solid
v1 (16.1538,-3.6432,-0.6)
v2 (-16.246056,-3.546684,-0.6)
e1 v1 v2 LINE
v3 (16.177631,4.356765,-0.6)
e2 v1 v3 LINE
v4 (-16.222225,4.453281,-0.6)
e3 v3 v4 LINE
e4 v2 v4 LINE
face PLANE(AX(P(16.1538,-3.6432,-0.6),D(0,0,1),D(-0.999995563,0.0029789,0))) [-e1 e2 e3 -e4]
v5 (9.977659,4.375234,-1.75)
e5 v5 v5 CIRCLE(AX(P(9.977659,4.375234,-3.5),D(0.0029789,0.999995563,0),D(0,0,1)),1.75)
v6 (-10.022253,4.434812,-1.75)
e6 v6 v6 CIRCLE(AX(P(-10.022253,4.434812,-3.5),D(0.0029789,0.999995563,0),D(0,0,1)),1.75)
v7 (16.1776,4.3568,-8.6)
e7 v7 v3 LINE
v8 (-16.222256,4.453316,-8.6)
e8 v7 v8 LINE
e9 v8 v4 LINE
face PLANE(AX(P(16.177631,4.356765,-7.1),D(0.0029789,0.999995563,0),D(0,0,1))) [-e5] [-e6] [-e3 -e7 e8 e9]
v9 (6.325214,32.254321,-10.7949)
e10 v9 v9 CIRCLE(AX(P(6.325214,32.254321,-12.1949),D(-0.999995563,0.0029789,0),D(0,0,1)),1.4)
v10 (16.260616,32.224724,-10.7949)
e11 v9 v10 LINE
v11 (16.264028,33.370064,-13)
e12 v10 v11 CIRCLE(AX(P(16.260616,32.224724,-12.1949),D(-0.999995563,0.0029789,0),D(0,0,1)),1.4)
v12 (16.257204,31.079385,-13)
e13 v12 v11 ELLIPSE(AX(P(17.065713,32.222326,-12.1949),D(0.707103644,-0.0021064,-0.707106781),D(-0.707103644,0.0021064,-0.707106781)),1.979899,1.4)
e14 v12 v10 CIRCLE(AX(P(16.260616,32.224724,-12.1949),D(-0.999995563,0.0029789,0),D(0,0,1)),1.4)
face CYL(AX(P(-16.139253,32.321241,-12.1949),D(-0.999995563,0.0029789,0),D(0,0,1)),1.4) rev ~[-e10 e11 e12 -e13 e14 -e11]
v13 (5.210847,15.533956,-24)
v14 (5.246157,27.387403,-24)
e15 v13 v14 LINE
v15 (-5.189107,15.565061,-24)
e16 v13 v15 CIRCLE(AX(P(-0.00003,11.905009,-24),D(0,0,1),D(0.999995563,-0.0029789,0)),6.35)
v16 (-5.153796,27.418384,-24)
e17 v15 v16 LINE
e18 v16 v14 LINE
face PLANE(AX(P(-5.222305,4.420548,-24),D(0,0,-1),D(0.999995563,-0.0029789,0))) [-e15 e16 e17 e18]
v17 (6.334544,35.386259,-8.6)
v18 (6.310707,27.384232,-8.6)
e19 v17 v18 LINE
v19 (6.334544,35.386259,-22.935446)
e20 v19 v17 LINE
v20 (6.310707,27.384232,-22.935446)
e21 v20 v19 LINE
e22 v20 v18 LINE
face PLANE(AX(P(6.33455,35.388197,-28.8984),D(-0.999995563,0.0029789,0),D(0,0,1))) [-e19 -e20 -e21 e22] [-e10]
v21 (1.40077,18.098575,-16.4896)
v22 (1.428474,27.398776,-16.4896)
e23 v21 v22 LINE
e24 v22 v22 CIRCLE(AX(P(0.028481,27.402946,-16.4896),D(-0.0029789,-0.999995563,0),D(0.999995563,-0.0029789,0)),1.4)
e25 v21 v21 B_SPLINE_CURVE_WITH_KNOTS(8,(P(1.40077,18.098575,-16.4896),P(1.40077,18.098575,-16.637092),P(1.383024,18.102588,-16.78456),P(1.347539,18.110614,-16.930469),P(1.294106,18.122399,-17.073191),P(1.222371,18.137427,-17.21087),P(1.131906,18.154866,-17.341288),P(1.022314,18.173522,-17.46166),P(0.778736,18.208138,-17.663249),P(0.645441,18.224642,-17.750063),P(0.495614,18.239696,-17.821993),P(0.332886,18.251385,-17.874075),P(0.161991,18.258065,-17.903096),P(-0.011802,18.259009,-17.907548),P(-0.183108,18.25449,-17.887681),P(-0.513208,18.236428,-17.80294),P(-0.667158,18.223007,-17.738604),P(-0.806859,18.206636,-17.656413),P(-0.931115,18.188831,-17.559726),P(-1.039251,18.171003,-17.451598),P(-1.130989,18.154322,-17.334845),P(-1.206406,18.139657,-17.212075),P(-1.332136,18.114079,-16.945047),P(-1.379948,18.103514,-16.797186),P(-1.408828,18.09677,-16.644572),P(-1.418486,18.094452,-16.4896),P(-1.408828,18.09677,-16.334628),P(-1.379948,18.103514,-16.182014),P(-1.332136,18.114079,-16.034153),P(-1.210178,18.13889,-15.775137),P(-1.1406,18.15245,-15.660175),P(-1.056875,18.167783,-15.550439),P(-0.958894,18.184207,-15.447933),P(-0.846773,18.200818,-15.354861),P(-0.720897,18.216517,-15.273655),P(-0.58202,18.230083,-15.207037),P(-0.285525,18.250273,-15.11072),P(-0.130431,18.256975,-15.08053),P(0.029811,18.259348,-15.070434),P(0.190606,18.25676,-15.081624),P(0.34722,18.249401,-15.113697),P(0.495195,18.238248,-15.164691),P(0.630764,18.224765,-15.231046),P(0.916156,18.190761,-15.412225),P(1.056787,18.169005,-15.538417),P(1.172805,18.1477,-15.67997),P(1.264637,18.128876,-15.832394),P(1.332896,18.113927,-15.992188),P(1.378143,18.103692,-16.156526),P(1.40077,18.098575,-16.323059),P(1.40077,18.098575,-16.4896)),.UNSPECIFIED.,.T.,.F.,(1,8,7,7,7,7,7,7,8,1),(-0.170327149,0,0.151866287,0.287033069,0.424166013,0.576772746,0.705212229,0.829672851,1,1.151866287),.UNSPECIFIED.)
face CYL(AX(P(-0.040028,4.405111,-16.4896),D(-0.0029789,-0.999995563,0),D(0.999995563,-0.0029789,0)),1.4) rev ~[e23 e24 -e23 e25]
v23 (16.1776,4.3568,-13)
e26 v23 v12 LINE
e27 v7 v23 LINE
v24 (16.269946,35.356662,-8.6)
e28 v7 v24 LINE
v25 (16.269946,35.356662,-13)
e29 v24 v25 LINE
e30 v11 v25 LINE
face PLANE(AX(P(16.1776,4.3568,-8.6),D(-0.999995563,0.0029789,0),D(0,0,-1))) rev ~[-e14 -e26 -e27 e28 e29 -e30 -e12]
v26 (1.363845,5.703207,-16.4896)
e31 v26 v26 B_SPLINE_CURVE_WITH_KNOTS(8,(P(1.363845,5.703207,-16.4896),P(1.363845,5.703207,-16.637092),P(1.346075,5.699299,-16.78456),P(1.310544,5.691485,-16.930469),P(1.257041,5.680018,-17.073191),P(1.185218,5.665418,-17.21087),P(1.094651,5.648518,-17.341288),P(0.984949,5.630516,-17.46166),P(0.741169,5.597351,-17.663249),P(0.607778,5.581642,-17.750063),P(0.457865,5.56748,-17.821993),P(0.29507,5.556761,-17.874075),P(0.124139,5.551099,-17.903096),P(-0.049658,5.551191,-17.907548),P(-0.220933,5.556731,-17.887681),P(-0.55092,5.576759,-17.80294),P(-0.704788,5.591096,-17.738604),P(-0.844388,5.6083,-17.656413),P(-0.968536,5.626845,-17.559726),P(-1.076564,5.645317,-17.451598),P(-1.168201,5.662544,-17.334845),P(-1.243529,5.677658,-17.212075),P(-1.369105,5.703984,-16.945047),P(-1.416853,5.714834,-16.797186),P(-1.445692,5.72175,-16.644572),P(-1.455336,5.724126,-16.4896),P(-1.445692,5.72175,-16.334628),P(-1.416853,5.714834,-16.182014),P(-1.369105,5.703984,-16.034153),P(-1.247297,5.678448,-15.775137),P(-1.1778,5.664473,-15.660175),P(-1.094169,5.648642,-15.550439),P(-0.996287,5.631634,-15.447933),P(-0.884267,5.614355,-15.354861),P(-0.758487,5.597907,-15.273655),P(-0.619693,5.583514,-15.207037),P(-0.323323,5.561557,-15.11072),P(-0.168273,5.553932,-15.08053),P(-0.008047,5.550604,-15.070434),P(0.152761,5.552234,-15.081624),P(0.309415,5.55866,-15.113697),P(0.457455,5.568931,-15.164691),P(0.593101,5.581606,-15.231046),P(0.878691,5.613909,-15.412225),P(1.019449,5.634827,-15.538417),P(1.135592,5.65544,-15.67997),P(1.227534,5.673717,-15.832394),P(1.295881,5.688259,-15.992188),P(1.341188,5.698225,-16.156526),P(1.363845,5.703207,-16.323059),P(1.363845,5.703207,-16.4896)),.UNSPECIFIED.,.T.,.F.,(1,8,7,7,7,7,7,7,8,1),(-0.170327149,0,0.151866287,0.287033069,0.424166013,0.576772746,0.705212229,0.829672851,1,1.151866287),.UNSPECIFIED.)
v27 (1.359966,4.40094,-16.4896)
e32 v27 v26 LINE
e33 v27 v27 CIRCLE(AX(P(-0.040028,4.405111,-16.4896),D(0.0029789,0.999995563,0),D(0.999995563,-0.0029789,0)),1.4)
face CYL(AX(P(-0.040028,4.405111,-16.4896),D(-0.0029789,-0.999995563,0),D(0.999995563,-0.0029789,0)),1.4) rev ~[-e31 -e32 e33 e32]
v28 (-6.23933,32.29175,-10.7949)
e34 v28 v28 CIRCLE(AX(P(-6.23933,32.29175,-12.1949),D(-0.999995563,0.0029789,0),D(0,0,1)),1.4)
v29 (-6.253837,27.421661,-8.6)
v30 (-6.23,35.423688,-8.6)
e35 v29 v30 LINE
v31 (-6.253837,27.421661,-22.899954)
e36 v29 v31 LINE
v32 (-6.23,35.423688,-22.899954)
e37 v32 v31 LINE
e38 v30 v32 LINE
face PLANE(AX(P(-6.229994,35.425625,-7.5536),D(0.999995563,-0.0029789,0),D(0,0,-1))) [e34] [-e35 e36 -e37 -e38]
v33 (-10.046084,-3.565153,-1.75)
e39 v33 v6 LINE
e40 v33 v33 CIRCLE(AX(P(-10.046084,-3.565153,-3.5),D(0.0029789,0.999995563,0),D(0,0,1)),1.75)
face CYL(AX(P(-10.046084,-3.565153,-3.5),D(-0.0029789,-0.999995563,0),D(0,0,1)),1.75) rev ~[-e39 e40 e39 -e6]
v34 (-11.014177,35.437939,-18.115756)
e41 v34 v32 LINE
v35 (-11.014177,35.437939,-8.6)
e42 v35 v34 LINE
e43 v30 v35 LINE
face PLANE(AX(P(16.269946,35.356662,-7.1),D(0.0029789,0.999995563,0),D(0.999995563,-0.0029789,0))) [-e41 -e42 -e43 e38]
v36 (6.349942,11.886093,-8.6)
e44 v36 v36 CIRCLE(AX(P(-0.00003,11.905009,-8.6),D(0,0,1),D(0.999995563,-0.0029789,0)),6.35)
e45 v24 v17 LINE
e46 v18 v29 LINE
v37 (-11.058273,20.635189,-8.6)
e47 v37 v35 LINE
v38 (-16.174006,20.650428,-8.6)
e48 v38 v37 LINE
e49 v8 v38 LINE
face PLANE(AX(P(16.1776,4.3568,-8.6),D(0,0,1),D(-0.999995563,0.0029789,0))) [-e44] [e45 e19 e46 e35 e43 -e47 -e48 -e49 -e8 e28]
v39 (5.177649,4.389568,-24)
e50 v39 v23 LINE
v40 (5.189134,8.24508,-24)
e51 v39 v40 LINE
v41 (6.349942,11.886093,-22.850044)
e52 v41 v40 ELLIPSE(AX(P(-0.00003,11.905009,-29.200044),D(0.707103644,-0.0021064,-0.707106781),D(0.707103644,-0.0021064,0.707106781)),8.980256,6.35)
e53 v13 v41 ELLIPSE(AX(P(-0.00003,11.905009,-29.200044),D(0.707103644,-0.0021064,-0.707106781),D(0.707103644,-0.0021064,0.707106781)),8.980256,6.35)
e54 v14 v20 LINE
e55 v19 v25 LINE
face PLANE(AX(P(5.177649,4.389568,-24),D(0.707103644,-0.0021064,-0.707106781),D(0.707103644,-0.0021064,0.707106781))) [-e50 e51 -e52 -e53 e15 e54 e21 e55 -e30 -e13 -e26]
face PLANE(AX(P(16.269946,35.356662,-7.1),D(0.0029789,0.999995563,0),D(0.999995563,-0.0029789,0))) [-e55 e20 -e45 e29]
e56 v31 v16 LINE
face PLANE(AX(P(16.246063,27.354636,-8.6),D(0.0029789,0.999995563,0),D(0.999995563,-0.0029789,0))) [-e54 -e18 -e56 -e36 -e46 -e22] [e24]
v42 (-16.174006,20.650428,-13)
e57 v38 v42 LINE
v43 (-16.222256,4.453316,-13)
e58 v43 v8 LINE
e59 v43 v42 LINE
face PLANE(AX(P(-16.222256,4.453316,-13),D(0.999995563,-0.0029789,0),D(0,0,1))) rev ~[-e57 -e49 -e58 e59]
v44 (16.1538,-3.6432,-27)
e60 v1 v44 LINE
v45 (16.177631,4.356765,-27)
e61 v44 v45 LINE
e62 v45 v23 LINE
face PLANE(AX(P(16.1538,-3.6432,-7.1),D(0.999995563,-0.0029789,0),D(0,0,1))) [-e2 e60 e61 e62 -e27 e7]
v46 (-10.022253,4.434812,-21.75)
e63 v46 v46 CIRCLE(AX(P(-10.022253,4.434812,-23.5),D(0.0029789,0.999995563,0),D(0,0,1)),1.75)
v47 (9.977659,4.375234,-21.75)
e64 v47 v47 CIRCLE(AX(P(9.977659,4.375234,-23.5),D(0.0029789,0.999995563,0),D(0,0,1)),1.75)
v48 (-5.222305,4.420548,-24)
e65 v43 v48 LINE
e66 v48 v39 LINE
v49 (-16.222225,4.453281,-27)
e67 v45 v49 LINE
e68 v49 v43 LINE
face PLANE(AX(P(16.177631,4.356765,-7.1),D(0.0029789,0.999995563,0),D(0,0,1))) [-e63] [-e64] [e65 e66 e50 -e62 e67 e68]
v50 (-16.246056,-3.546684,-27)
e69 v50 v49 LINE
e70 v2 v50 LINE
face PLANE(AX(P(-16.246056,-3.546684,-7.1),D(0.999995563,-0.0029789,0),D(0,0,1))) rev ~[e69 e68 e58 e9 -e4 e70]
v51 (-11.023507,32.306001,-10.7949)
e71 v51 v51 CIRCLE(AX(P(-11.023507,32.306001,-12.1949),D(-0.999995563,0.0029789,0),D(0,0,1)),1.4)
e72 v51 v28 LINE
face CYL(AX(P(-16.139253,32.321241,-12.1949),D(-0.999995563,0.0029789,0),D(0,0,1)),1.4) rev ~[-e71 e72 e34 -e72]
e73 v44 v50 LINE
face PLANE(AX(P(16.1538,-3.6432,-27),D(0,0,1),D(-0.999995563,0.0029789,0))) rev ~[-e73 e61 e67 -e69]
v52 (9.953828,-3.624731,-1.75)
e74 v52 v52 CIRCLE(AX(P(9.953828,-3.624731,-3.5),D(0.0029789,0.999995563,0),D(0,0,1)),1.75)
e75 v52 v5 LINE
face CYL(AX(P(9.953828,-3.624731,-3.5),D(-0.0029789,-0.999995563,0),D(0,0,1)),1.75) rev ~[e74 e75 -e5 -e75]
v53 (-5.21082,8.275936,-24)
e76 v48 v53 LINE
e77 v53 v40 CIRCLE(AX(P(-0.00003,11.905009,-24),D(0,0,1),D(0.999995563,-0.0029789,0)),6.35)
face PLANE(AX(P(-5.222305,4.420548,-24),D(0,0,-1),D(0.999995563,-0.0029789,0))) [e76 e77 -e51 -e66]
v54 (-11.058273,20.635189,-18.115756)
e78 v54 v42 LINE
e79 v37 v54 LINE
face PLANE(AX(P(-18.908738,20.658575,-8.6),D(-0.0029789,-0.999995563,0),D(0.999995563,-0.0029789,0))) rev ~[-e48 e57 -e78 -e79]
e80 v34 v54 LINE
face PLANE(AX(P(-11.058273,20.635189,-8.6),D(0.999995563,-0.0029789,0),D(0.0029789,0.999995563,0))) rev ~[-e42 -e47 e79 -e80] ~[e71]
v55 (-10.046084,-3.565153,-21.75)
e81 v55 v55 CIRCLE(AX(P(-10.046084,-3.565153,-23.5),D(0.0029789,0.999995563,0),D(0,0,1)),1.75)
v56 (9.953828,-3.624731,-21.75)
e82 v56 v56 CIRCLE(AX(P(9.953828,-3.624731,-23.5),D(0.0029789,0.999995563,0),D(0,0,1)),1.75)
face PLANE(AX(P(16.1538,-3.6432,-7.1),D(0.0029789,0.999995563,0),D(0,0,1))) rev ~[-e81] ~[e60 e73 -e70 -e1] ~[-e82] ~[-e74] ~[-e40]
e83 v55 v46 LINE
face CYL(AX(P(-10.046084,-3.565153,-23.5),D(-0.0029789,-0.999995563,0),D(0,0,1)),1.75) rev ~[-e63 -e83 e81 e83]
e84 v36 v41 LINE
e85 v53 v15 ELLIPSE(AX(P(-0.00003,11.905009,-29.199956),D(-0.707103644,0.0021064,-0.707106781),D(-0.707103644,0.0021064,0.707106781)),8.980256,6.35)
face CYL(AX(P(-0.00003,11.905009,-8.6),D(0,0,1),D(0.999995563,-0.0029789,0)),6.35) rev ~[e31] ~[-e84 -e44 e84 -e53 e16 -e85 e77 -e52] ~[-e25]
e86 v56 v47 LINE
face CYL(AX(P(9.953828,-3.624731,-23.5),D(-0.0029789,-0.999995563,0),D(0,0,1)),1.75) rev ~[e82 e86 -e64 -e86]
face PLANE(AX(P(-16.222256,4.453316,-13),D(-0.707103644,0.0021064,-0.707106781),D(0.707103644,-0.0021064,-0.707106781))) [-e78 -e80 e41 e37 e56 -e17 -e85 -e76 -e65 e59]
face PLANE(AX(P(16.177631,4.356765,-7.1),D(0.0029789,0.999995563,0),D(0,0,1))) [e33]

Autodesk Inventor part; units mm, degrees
ref_plane "YZ Plane" through (0, 0, 0) normal (1, 0, 0) x (0, 1, 0)
ref_plane "Work Plane5" through (16.1538, -3.6432, -7.1) normal (0.0029789, 0.9999956, 0) x (0, 0, 1)
sketch "Sketch5" plane through (16.1538, -3.6432, -7.1) normal (0.0029789, 0.9999956, 0) x (0, 0, 1)
  circle A0 centre (-16.4, -26.2) radius 1.75 projected
  circle A1 centre (-16.4, -6.2) radius 1.75 projected
  line L0 (0, -32.4) -> (6.5, -32.4) projected
  line L1 (6.5, 0) -> (6.5, -32.4) projected
  line L2 (0, 0) -> (6.5, 0) projected
  line L3 (0, 0) -> (0, -32.4) projected
  circle A2 centre (3.6, -6.2) radius 1.75 projected
  circle A3 centre (3.6, -26.2) radius 1.75 projected
  line L4 (-19.9, 0) -> (-19.9, -32.4) projected
  line L5 (6.5, -32.4) -> (-19.9, -32.4)
  line L6 (-19.9, -32.4) -> (-19.9, 0)
  line L7 (-19.9, 0) -> (6.5, 0)
  line L8 (6.5, 0) -> (6.5, -32.4)
  point P0 (7.1, -16.1645)
extrude "Extrusion4" add sketch "Sketch5" along normal blind 8
sketch "Sketch7" plane through (16.1776, 4.3568, -7.1) normal (0.0029789, 0.9999956, 0) x (0.9999956, -0.0029789, 0)
  point P0 (-16.1645, -7.1)
sketch "Sketch8" plane through (16.1776, 4.3568, -7.1) normal (0.0029789, 0.9999956, 0) x (0.9999956, -0.0029789, 0)
  circle A0 centre (-26.2, -3.6) radius 1.75 projected
  circle A1 centre (-6.2, -3.6) radius 1.75 projected
  circle A2 centre (-6.2, 16.4) radius 1.75 projected
  circle A3 centre (-26.2, 16.4) radius 1.75 projected
  line L0 (-32.4, -6.5) -> (0, -6.5) projected
  line L1 (0, -6.5) -> (0, 19.9) projected
  line L2 (0, 19.9) -> (-32.4, 19.9) projected
  line L3 (-32.4, 19.9) -> (-32.4, -6.5) projected
  circle A4 centre (-16.2177, 39.3896) radius 1.75 projected
  line L4 (-22.2006, -0.6104) -> (-22.0458, -0.6104) projected
  line L5 (-22.2, -0.6104) -> (-22.2, -0.6104) projected
  line L6 (-22.2, -0.6104) -> (-21.7015, -0.6104) projected
  line L7 (-21.7015, -0.6104) -> (-14.6224, -0.6104) projected
  line L8 (-14.6224, -0.6104) -> (-13.8248, -0.6104) projected
  line L9 (-13.8248, -0.6104) -> (-10.7339, -0.6104) projected
  line L10 (-10.7339, -0.6104) -> (-10.2354, -0.6104) projected
  line L11 (-10.2354, -0.6104) -> (-10.2354, -0.6104) projected
  line L12 (-10.3901, -0.6104) -> (-10.2354, -0.6104) projected
  line L13 (-10.966, -0.6104) -> (-10.3901, -0.6104) projected
  line L14 (-11.1588, -0.6104) -> (-10.966, -0.6104) projected
  line L15 (-11.1588, -0.6104) -> (-11.5034, -0.6104) projected
  line L16 (-11.731, -0.6104) -> (-11.5034, -0.6104) projected
  line L17 (-11.731, -0.6104) -> (-11.731, -0.6104) projected
  line L18 (-11.731, -0.6104) -> (-11.5034, -0.6104) projected
  line L19 (-11.5034, -0.6104) -> (-11.1379, -0.6104) projected
  line L20 (-11.1379, -0.6104) -> (-10.9487, -0.6104) projected
  line L21 (-10.9487, -0.6104) -> (-10.3901, -0.6104) projected
  line L22 (-10.3901, -0.6104) -> (-10.2354, -0.6104) projected
  line L23 (-10.2354, -0.6104) -> (-10.2354, -0.6104) projected
  line L24 (-10.2354, -0.6104) -> (-10.7339, -0.6104) projected
  line L25 (-10.7339, -0.6104) -> (-21.7015, -0.6104) projected
  line L26 (-21.7015, -0.6104) -> (-22.2, -0.6104) projected
  line L27 (-22.2, -0.6104) -> (-22.2, -0.6104) projected
  line L28 (-22.2001, -0.6104) -> (-22.0454, -0.6104) projected
  line L29 (-22.0454, -0.6104) -> (-21.4867, -0.6104) projected
  line L30 (-21.4867, -0.6104) -> (-21.2975, -0.6104) projected
  line L31 (-21.2975, -0.6104) -> (-20.932, -0.6104) projected
  line L32 (-20.932, -0.6104) -> (-20.7045, -0.6104) projected
  line L33 (-20.7045, -0.6104) -> (-20.7045, -0.6104) projected
  line L34 (-20.932, -0.6104) -> (-20.7045, -0.6104) projected
  line L35 (-20.932, -0.6104) -> (-21.2766, -0.6104) projected
  line L36 (-21.4694, -0.6104) -> (-21.2766, -0.6104) projected
  line L37 (-22.0458, -0.6104) -> (-21.4694, -0.6104) projected
  line L38 (-32.4, 19.9) -> (-32.4, -6.5) projected
  line L39 (-32.4, 5.9) -> (-21.4, 16.9)
  line L40 (-21.4, 16.9) -> (-11, 16.9)
  line L41 (-11, 16.9) -> (0, 5.9)
  line L42 (0, -6.5) -> (0, 19.9) projected
  line L43 (0, 1.5) -> (-32.4, 1.5)
  line L44 (-32.4, 5.9) -> (-32.4, -0.0368)
  line L45 (0, 5.9) -> (0, 1.5)
  circle A5 centre (-16.2177, 9.3896) radius 1.75
  circle A6 centre (-16.2177, 9.3896) radius 1.4
  point P0 (-16.1645, -7.1)
  dimension "d25" = 45
  dimension "d26" = 45
  dimension "d27" = 3
  dimension "d28" = 11
  dimension "d29" = 11
  dimension "d30" = 8
  dimension "d46" = 2.8
ref_plane "Work Plane7" through (-5.4512, 35.4213, -181.4907) normal (0.0029789, 0.9999956, 0) x (0, 0, 1)
extrude "Extrusion5" add sketch "Sketch8" along normal up to surface (31 mm away) contours L43 L3 L39 L40 L41 L1 | A5
sketch "Sketch9" plane through (16.2699, 35.3566, -8.6) normal (0.0029789, 0.9999956, 0) x (0.9999956, -0.0029789, 0)
  line L0 (-22.2, -2.1104) -> (-22.2, 197.8896) projected
  line L1 (-10.2354, -2.1104) -> (-10.2354, 197.8896) projected
  line L2 (-22.5, 20.2984) -> (-9.9354, 20.2984)
  line L3 (-9.9354, 20.2984) -> (-9.9354, -1.0464)
  line L4 (-9.9354, -1.0464) -> (-22.5, -1.0464)
  line L5 (-22.5, -1.0464) -> (-22.5, 20.2984)
  point P0 (-16.1645, -8.6)
  dimension "d34" = 0.3
  dimension "d35" = 0.3
ref_plane "Work Plane8" through (-5.4751, 27.4214, -181.4903) normal (-0.0029789, -0.9999956, 0) x (0.9999956, -0.0029789, 0)
extrude "Extrusion6" cut sketch "Sketch9" against normal up to surface (8 mm away)
sketch "Sketch10" plane through (-16.2461, -3.5467, -27) normal (-0.9999956, 0.0029789, 0) x (0, 0, 1)
  line L0 (0, 0) -> (26.4, 0) projected
  line L1 (26.4, 0) -> (26.4, 8) projected
  line L2 (18.4, 8) -> (26.4, 8) projected
  line L3 (0, 0) -> (0, 8) projected
  circle A0 centre (14.8051, 35.8681) radius 1.4
  line L4 (18.4, 8) -> (18.4, 39) projected
  line L5 (18.4, 39) -> (14, 39) projected
  line L6 (14, 8) -> (14, 39) projected
  line L7 (0, 8) -> (14, 8) projected
  point P0 (27, 3.595)
  dimension "d38" = 2.8
extrude "Extrusion7" cut sketch "Sketch10" against normal through all contours L6 A0 | A0 L6
sketch "Sketch11" plane through (-16.2223, 4.4533, -8.6) normal (0, 0, 1) x (0.9999956, -0.0029789, 0)
  circle A0 centre (16.2, 7.5) radius 5.65 projected
  circle A1 centre (16.2, 7.5) radius 6.35
  point P0 (16.2355, -4.405)
  dimension "d41" = 0.7
extrude "Extrusion8" cut sketch "Sketch11" against normal through all contours A0 | A1
sketch "Sketch12" plane through (-16.2223, 4.4533, -8.6) normal (0, 0, 1) x (0.9999956, -0.0029789, 0)
  line L0 (3.2, 25.4) -> (-3.8, 25.4) projected
  line L1 (3.2, 25.4) -> (3.2, 69.4) projected
  line L2 (-3.8, 69.4) -> (3.2, 69.4) projected
  line L3 (3.2, 18.4) -> (3.2, 26.4) projected
  line L4 (-2.7347, 16.1972) -> (5.1158, 16.1972)
  line L5 (5.1158, 16.1972) -> (5.1158, 65.2014)
  line L6 (5.1158, 65.2014) -> (-2.7347, 65.2014)
  line L7 (-2.7347, 65.2014) -> (-2.7347, 16.1972)
  line L8 (-3.8, 25.4) -> (-3.8, 69.4) projected
  line L9 (-3.8, 18.4) -> (3.2, 18.4) projected
  line L10 (-3.8, 26.4) -> (-3.8, 18.4) projected
  line L11 (3.2, 26.4) -> (-3.8, 26.4) projected
  point P0 (16.2355, -4.405)
  point P1 (-1.8, 18.4)
  point P2 (-1.8, 26.4)
extrude "Extrusion9" cut sketch "Sketch12" against normal through all contours L3 L9 L7 L0 | L0 L7 L11 L1 | L1 L6 L5 L4 L7 L9 L3 | L11 L7 L6 L1
properties part number "03_Support_Xslide"
